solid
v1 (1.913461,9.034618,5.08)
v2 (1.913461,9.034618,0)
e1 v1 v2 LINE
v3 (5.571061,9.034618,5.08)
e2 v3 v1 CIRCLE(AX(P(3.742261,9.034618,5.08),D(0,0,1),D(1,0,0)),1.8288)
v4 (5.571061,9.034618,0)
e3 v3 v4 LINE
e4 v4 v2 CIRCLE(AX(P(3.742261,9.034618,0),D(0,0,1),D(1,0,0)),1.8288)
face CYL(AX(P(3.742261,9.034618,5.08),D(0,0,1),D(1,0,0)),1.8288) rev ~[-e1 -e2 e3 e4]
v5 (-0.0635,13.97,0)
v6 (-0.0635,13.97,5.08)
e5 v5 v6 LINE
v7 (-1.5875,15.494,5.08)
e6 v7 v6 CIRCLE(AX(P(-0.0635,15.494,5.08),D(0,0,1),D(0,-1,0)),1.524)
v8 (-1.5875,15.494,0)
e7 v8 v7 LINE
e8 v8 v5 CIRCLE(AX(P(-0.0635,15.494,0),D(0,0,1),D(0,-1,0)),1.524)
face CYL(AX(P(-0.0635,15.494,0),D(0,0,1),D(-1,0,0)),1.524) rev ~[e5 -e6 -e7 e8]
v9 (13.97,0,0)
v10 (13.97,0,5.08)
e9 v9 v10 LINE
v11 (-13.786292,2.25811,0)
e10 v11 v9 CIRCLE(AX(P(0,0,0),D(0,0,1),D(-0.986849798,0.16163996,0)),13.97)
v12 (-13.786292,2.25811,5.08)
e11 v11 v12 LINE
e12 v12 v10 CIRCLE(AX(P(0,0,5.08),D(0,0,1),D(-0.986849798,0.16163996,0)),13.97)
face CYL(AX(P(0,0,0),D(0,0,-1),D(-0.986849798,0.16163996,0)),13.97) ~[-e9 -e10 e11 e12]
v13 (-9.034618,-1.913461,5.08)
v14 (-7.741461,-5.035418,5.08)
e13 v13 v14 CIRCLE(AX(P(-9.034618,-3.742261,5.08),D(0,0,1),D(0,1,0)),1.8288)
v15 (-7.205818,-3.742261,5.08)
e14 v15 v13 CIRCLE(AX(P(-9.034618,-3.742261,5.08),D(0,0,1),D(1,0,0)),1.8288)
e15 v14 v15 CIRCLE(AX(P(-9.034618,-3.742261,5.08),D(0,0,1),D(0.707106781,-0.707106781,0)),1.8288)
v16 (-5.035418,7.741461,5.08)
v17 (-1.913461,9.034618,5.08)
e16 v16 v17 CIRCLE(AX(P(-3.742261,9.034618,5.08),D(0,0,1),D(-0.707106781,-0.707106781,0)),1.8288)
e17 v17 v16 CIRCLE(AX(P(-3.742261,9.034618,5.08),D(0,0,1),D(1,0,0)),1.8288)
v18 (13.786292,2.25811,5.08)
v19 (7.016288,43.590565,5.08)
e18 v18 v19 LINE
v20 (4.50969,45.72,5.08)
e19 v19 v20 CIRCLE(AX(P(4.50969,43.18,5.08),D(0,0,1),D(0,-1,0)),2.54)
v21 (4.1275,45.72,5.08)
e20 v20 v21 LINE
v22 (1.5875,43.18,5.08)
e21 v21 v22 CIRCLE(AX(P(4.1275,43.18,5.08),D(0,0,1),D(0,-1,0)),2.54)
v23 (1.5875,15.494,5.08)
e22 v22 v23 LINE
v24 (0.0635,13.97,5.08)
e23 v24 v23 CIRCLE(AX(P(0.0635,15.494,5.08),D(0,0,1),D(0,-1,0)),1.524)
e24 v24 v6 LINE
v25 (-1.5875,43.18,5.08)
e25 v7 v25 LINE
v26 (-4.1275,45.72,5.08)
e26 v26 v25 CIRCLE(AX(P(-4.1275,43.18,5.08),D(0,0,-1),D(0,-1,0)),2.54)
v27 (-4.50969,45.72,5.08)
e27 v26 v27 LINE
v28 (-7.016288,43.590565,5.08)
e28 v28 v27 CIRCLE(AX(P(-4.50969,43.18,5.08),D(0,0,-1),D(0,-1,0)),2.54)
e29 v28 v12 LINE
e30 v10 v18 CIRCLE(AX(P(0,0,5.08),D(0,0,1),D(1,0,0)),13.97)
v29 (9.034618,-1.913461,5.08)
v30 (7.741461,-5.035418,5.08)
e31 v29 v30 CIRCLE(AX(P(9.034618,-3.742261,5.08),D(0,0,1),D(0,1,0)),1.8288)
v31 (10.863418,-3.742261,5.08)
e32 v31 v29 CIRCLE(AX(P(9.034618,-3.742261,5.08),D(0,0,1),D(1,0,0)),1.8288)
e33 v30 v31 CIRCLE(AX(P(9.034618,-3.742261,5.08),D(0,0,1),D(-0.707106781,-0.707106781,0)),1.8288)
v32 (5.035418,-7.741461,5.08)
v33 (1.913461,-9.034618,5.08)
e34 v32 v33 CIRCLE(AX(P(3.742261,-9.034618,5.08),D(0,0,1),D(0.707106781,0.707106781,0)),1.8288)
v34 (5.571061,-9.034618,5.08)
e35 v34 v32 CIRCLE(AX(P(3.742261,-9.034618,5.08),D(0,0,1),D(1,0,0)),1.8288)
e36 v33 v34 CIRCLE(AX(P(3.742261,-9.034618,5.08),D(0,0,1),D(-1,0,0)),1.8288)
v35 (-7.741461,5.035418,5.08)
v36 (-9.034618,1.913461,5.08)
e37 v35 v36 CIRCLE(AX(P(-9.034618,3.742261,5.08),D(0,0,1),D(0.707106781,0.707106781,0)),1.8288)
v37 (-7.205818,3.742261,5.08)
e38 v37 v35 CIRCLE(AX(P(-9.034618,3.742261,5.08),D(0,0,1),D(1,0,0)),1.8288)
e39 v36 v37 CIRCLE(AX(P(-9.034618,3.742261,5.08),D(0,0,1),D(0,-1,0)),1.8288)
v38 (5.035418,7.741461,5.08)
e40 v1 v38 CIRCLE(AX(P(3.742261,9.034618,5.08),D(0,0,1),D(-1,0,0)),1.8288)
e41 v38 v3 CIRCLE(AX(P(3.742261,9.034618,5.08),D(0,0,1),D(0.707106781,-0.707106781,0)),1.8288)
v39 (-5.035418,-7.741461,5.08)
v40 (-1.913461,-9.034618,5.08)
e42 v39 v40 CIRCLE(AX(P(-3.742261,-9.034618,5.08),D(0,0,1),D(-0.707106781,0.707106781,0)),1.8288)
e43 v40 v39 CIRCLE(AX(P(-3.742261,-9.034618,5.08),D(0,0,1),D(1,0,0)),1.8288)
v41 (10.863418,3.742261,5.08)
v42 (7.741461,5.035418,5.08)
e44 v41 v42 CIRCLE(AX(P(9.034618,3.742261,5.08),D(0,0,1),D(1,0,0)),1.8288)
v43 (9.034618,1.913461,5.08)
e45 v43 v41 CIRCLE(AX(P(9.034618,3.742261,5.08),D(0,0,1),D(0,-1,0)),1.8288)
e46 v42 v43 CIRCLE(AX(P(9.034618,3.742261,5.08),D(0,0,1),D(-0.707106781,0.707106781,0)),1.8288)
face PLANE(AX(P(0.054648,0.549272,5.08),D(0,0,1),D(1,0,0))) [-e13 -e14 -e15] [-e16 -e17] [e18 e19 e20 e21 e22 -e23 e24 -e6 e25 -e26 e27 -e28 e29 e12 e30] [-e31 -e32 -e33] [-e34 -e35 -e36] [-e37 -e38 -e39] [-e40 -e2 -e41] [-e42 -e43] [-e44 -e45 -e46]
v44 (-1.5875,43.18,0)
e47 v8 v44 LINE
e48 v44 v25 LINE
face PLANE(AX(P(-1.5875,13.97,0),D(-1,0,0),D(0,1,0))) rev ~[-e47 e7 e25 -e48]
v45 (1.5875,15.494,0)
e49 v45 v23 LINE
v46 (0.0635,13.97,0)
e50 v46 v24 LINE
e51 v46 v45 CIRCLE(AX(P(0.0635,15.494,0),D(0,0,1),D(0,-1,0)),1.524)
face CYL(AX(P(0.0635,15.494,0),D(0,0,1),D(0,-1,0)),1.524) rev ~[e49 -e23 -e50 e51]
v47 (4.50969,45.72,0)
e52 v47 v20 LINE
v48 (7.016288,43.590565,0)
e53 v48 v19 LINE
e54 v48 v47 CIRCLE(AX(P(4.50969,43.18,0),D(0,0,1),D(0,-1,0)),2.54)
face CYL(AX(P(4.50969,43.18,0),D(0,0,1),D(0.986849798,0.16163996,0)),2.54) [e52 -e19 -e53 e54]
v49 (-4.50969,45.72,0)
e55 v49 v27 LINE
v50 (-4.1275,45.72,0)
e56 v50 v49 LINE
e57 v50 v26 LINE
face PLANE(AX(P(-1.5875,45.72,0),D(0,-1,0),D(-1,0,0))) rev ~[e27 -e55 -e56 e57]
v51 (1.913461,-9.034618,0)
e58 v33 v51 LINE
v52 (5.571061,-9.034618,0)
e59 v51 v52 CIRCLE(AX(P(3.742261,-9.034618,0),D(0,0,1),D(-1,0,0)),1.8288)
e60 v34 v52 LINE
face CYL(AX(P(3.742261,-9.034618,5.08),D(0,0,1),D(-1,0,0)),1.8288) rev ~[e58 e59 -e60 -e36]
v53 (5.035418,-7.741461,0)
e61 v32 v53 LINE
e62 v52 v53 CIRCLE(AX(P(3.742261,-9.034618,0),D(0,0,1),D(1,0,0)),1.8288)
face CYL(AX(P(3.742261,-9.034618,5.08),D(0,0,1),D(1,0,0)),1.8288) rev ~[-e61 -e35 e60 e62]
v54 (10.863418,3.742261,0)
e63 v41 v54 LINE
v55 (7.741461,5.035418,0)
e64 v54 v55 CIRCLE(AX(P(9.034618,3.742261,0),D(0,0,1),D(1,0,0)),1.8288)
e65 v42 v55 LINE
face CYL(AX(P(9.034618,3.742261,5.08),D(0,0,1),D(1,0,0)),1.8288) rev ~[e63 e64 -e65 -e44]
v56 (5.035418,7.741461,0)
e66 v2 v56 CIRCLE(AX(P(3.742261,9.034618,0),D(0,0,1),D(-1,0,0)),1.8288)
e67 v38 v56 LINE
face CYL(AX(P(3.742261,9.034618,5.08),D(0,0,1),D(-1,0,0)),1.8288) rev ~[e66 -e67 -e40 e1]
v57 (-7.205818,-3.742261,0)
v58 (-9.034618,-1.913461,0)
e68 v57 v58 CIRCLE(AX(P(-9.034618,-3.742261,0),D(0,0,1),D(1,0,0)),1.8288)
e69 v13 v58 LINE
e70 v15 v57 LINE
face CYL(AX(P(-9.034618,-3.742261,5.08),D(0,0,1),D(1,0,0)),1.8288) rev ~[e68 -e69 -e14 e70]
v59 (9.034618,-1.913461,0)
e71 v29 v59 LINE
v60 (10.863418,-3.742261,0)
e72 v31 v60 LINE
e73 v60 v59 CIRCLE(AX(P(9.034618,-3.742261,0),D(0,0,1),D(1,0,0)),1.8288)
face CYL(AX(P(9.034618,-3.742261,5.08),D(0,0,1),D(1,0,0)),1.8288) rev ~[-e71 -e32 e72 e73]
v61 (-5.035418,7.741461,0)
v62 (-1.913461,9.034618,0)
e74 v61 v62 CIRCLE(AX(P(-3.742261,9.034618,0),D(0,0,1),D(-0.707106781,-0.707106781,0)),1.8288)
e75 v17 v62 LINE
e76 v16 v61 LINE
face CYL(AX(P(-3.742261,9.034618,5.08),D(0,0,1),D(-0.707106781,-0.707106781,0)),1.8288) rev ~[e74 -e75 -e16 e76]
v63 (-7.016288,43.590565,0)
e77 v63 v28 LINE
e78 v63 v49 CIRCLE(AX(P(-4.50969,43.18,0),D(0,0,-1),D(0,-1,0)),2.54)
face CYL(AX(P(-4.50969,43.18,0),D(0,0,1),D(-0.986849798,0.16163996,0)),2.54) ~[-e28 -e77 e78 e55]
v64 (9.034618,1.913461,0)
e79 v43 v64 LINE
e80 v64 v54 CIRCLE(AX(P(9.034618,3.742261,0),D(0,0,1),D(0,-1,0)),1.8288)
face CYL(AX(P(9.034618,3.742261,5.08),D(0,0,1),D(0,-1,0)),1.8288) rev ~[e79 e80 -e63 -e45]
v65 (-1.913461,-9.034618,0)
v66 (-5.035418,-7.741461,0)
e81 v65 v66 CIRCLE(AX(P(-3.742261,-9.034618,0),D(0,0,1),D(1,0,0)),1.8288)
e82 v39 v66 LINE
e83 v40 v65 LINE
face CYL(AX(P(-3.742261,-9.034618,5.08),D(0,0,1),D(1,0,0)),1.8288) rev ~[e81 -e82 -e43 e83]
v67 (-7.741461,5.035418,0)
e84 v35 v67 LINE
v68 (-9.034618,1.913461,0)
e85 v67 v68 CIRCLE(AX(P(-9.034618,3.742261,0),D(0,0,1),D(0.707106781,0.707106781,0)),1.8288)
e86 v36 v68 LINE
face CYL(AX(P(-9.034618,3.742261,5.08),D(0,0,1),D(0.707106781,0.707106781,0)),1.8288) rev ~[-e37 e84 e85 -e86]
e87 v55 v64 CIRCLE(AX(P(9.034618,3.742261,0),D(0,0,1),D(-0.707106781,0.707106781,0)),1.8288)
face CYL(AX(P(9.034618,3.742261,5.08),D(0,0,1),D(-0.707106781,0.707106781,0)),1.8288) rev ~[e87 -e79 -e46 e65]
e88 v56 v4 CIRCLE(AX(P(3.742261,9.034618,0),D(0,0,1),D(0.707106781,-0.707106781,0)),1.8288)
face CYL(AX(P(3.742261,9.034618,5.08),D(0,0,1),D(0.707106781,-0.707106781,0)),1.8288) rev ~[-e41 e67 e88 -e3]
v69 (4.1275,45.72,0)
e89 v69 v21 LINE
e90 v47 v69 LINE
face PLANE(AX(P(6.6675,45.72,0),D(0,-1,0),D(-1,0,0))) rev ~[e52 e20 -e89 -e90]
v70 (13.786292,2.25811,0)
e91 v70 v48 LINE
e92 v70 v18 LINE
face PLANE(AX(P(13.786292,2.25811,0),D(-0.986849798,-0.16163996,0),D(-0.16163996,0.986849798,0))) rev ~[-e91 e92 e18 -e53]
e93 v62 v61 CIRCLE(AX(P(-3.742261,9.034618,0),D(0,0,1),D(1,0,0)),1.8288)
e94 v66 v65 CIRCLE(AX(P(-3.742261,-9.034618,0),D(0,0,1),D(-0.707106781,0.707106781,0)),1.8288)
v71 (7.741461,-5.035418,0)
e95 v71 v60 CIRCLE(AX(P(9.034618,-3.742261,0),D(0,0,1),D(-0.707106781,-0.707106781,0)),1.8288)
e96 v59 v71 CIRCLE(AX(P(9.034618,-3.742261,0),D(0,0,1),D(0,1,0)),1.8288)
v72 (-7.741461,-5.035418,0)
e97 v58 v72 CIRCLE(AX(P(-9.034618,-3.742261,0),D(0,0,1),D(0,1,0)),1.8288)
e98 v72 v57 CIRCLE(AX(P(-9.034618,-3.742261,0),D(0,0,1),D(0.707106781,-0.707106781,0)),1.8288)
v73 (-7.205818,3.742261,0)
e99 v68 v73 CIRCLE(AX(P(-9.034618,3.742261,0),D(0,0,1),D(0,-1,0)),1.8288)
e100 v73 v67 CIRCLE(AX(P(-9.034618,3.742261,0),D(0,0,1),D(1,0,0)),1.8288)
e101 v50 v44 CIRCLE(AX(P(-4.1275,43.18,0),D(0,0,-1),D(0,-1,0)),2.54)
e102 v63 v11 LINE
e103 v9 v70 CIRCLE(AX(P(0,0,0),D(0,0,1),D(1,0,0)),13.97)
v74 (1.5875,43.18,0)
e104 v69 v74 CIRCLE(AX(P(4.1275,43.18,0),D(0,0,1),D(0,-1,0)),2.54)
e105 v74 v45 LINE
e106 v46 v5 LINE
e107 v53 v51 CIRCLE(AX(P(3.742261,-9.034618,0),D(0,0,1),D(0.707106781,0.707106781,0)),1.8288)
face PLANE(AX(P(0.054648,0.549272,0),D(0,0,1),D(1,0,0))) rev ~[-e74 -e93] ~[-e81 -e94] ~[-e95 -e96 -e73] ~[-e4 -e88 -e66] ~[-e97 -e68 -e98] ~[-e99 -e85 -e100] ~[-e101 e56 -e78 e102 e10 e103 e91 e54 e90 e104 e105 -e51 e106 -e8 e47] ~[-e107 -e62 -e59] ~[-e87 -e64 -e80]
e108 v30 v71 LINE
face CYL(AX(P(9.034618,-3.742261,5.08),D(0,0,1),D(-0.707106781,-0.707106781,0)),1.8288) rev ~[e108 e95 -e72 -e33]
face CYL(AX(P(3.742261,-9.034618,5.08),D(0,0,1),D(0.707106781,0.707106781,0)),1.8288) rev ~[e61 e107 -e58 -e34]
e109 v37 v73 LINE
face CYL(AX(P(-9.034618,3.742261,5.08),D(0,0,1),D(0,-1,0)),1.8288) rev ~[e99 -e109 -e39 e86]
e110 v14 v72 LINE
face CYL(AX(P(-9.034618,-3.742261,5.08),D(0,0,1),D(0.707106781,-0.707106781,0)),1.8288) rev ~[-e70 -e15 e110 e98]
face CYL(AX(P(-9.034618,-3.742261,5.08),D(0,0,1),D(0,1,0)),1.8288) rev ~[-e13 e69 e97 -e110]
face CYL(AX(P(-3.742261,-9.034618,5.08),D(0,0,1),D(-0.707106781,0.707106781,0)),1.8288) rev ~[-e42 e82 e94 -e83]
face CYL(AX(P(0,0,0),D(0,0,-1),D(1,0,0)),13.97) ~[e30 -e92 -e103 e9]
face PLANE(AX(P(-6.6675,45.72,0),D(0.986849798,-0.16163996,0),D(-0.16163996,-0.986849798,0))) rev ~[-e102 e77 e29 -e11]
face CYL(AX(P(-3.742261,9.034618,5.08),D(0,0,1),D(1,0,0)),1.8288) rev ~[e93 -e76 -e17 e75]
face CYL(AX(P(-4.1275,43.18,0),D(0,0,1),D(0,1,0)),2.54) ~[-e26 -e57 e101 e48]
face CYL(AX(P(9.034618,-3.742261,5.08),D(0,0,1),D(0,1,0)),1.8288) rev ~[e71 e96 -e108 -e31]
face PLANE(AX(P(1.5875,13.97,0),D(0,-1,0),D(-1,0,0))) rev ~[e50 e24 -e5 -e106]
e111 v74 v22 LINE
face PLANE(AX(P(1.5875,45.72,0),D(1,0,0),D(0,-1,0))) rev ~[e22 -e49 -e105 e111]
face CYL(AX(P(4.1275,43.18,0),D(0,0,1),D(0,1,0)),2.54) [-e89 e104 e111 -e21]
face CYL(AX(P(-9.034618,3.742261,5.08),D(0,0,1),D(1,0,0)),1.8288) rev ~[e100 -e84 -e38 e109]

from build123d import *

# Parameters (mm, degrees)
F1_DEPTH = 5.08
F3_DEPTH = 25.4
F4_R     = 2.54
F5_R     = 1.524


with BuildPart() as f1:
    # F0 (on Top) → F1 (new body)
    with BuildSketch(Plane.XY):
        with BuildLine():
            ThreePointArc((-13.7862916745, 2.2581102419), (-1.1327853518, -13.9239971756), (13.97, 0))
            ThreePointArc((13.97, 0), (13.9239971756, 1.1327853518), (13.7862916745, 2.2581102419))
            ThreePointArc((13.7862916745, 2.2581102419), (9.0447526202, 10.646753028), (0, 13.97))
            ThreePointArc((0, 13.97), (-9.0447526202, 10.646753028), (-13.7862916745, 2.2581102419))
        make_face()
        with BuildLine():
            Line((-6.6675, 45.72), (-13.7862916745, 2.2581102419))
            ThreePointArc((-13.7862916745, 2.2581102419), (-9.0447526202, 10.646753028), (0, 13.97))
            Line((0, 13.97), (-1.5875, 13.97))
            Line((-1.5875, 13.97), (-1.5875, 45.72))
            Line((-1.5875, 45.72), (-6.6675, 45.72))
        make_face()
        with BuildLine():
            ThreePointArc((0, 13.97), (9.0447526202, 10.646753028), (13.7862916745, 2.2581102419))
            Line((13.7862916745, 2.2581102419), (6.6675, 45.72))
            Line((6.6675, 45.72), (1.5875, 45.72))
            Line((1.5875, 45.72), (1.5875, 13.97))
            Line((1.5875, 13.97), (0, 13.97))
        make_face()
    extrude(amount=F1_DEPTH)

    # F2 (on face) → F3 (cut)
    with BuildSketch(Plane.XY.offset(5.08)):
        with BuildLine():
            Line((-3.7422612851, 9.0346179484), (-1.9134612851, 9.0346179484))
            ThreePointArc((-1.9134612851, 9.0346179484), (-4.4421127462, 10.7242088375), (-5.0354181665, 7.741461067))
            Line((-5.0354181665, 7.741461067), (-3.7422612851, 9.0346179484))
        make_face()
        with BuildLine():
            ThreePointArc((-5.0354181665, 7.741461067), (-3.042409824, 7.3450270594), (-1.9134612851, 9.0346179484))
            Line((-1.9134612851, 9.0346179484), (-3.7422612851, 9.0346179484))
            Line((-3.7422612851, 9.0346179484), (-5.0354181665, 7.741461067))
        make_face()
        with BuildLine():
            Line((3.7422612851, 9.0346179484), (5.0354181665, 7.741461067))
            ThreePointArc((5.0354181665, 7.741461067), (5.4318521742, 8.3347664873), (5.5710612851, 9.0346179484))
            ThreePointArc((5.5710612851, 9.0346179484), (3.7422612851, 10.8634179484), (1.9134612851, 9.0346179484))
            Line((1.9134612851, 9.0346179484), (3.7422612851, 9.0346179484))
        make_face()
        with BuildLine():
            ThreePointArc((1.9134612851, 9.0346179484), (3.042409824, 7.3450270594), (5.0354181665, 7.741461067))
            Line((5.0354181665, 7.741461067), (3.7422612851, 9.0346179484))
            Line((3.7422612851, 9.0346179484), (1.9134612851, 9.0346179484))
        make_face()
        with BuildLine():
            Line((7.741461067, 5.0354181665), (9.0346179484, 3.7422612851))
            Line((9.0346179484, 3.7422612851), (9.0346179484, 1.9134612851))
            ThreePointArc((9.0346179484, 1.9134612851), (10.3277748299, 2.4491044037), (10.8634179484, 3.7422612851))
            ThreePointArc((10.8634179484, 3.7422612851), (9.7344694095, 5.4318521742), (7.741461067, 5.0354181665))
        make_face()
        with BuildLine():
            Line((9.0346179484, 1.9134612851), (9.0346179484, 3.7422612851))
            Line((9.0346179484, 3.7422612851), (7.741461067, 5.0354181665))
            ThreePointArc((7.741461067, 5.0354181665), (7.3450270594, 3.042409824), (9.0346179484, 1.9134612851))
        make_face()
        with BuildLine():
            ThreePointArc((10.8634179484, -3.7422612851), (10.3277748299, -2.4491044037), (9.0346179484, -1.9134612851))
            Line((9.0346179484, -1.9134612851), (9.0346179484, -3.7422612851))
            Line((9.0346179484, -3.7422612851), (7.741461067, -5.0354181665))
            ThreePointArc((7.741461067, -5.0354181665), (9.7344694095, -5.4318521742), (10.8634179484, -3.7422612851))
        make_face()
        with BuildLine():
            Line((9.0346179484, -3.7422612851), (9.0346179484, -1.9134612851))
            ThreePointArc((9.0346179484, -1.9134612851), (7.3450270594, -3.042409824), (7.741461067, -5.0354181665))
            Line((7.741461067, -5.0354181665), (9.0346179484, -3.7422612851))
        make_face()
        with BuildLine():
            ThreePointArc((5.5710612851, -9.0346179484), (5.4318521742, -8.3347664873), (5.0354181665, -7.741461067))
            Line((5.0354181665, -7.741461067), (3.7422612851, -9.0346179484))
            Line((3.7422612851, -9.0346179484), (1.9134612851, -9.0346179484))
            ThreePointArc((1.9134612851, -9.0346179484), (3.7422612851, -10.8634179484), (5.5710612851, -9.0346179484))
        make_face()
        with BuildLine():
            Line((3.7422612851, -9.0346179484), (5.0354181665, -7.741461067))
            ThreePointArc((5.0354181665, -7.741461067), (3.042409824, -7.3450270594), (1.9134612851, -9.0346179484))
            Line((1.9134612851, -9.0346179484), (3.7422612851, -9.0346179484))
        make_face()
        with BuildLine():
            ThreePointArc((-5.0354181665, -7.741461067), (-4.4421127462, -10.7242088375), (-1.9134612851, -9.0346179484))
            Line((-1.9134612851, -9.0346179484), (-3.7422612851, -9.0346179484))
            Line((-3.7422612851, -9.0346179484), (-5.0354181665, -7.741461067))
        make_face()
        with BuildLine():
            Line((-3.7422612851, -9.0346179484), (-1.9134612851, -9.0346179484))
            ThreePointArc((-1.9134612851, -9.0346179484), (-3.042409824, -7.3450270594), (-5.0354181665, -7.741461067))
            Line((-5.0354181665, -7.741461067), (-3.7422612851, -9.0346179484))
        make_face()
        with BuildLine():
            Line((-9.0346179484, -3.7422612851), (-7.741461067, -5.0354181665))
            ThreePointArc((-7.741461067, -5.0354181665), (-7.3450270594, -4.4421127462), (-7.2058179484, -3.7422612851))
            ThreePointArc((-7.2058179484, -3.7422612851), (-7.741461067, -2.4491044037), (-9.0346179484, -1.9134612851))
            Line((-9.0346179484, -1.9134612851), (-9.0346179484, -3.7422612851))
        make_face()
        with BuildLine():
            ThreePointArc((-9.0346179484, -1.9134612851), (-10.7242088375, -4.4421127462), (-7.741461067, -5.0354181665))
            Line((-7.741461067, -5.0354181665), (-9.0346179484, -3.7422612851))
            Line((-9.0346179484, -3.7422612851), (-9.0346179484, -1.9134612851))
        make_face()
        with BuildLine():
            Line((-9.0346179484, 3.7422612851), (-7.741461067, 5.0354181665))
            ThreePointArc((-7.741461067, 5.0354181665), (-10.7242088375, 4.4421127462), (-9.0346179484, 1.9134612851))
            Line((-9.0346179484, 1.9134612851), (-9.0346179484, 3.7422612851))
        make_face()
        with BuildLine():
            ThreePointArc((-7.2058179484, 3.7422612851), (-7.3450270594, 4.4421127462), (-7.741461067, 5.0354181665))
            Line((-7.741461067, 5.0354181665), (-9.0346179484, 3.7422612851))
            Line((-9.0346179484, 3.7422612851), (-9.0346179484, 1.9134612851))
            ThreePointArc((-9.0346179484, 1.9134612851), (-7.741461067, 2.4491044037), (-7.2058179484, 3.7422612851))
        make_face()
    extrude(amount=-F3_DEPTH, mode=Mode.SUBTRACT)

    # F4
    f4_edges = [f1.edges().sort_by_distance(p)[0] for p in [
        (1.5875, 45.72, 2.54),
        (-1.5875, 45.72, 2.54),
        (-6.6675, 45.72, 2.54),
        (6.6675, 45.72, 2.54),
    ]]
    fillet(f4_edges, radius=F4_R)

    # F5
    f5_edges = [f1.edges().sort_by_distance(p)[0] for p in [
        (-1.5875, 13.97, 2.54),
        (1.5875, 13.97, 2.54),
    ]]
    fillet(f5_edges, radius=F5_R)


solid = f1.part
